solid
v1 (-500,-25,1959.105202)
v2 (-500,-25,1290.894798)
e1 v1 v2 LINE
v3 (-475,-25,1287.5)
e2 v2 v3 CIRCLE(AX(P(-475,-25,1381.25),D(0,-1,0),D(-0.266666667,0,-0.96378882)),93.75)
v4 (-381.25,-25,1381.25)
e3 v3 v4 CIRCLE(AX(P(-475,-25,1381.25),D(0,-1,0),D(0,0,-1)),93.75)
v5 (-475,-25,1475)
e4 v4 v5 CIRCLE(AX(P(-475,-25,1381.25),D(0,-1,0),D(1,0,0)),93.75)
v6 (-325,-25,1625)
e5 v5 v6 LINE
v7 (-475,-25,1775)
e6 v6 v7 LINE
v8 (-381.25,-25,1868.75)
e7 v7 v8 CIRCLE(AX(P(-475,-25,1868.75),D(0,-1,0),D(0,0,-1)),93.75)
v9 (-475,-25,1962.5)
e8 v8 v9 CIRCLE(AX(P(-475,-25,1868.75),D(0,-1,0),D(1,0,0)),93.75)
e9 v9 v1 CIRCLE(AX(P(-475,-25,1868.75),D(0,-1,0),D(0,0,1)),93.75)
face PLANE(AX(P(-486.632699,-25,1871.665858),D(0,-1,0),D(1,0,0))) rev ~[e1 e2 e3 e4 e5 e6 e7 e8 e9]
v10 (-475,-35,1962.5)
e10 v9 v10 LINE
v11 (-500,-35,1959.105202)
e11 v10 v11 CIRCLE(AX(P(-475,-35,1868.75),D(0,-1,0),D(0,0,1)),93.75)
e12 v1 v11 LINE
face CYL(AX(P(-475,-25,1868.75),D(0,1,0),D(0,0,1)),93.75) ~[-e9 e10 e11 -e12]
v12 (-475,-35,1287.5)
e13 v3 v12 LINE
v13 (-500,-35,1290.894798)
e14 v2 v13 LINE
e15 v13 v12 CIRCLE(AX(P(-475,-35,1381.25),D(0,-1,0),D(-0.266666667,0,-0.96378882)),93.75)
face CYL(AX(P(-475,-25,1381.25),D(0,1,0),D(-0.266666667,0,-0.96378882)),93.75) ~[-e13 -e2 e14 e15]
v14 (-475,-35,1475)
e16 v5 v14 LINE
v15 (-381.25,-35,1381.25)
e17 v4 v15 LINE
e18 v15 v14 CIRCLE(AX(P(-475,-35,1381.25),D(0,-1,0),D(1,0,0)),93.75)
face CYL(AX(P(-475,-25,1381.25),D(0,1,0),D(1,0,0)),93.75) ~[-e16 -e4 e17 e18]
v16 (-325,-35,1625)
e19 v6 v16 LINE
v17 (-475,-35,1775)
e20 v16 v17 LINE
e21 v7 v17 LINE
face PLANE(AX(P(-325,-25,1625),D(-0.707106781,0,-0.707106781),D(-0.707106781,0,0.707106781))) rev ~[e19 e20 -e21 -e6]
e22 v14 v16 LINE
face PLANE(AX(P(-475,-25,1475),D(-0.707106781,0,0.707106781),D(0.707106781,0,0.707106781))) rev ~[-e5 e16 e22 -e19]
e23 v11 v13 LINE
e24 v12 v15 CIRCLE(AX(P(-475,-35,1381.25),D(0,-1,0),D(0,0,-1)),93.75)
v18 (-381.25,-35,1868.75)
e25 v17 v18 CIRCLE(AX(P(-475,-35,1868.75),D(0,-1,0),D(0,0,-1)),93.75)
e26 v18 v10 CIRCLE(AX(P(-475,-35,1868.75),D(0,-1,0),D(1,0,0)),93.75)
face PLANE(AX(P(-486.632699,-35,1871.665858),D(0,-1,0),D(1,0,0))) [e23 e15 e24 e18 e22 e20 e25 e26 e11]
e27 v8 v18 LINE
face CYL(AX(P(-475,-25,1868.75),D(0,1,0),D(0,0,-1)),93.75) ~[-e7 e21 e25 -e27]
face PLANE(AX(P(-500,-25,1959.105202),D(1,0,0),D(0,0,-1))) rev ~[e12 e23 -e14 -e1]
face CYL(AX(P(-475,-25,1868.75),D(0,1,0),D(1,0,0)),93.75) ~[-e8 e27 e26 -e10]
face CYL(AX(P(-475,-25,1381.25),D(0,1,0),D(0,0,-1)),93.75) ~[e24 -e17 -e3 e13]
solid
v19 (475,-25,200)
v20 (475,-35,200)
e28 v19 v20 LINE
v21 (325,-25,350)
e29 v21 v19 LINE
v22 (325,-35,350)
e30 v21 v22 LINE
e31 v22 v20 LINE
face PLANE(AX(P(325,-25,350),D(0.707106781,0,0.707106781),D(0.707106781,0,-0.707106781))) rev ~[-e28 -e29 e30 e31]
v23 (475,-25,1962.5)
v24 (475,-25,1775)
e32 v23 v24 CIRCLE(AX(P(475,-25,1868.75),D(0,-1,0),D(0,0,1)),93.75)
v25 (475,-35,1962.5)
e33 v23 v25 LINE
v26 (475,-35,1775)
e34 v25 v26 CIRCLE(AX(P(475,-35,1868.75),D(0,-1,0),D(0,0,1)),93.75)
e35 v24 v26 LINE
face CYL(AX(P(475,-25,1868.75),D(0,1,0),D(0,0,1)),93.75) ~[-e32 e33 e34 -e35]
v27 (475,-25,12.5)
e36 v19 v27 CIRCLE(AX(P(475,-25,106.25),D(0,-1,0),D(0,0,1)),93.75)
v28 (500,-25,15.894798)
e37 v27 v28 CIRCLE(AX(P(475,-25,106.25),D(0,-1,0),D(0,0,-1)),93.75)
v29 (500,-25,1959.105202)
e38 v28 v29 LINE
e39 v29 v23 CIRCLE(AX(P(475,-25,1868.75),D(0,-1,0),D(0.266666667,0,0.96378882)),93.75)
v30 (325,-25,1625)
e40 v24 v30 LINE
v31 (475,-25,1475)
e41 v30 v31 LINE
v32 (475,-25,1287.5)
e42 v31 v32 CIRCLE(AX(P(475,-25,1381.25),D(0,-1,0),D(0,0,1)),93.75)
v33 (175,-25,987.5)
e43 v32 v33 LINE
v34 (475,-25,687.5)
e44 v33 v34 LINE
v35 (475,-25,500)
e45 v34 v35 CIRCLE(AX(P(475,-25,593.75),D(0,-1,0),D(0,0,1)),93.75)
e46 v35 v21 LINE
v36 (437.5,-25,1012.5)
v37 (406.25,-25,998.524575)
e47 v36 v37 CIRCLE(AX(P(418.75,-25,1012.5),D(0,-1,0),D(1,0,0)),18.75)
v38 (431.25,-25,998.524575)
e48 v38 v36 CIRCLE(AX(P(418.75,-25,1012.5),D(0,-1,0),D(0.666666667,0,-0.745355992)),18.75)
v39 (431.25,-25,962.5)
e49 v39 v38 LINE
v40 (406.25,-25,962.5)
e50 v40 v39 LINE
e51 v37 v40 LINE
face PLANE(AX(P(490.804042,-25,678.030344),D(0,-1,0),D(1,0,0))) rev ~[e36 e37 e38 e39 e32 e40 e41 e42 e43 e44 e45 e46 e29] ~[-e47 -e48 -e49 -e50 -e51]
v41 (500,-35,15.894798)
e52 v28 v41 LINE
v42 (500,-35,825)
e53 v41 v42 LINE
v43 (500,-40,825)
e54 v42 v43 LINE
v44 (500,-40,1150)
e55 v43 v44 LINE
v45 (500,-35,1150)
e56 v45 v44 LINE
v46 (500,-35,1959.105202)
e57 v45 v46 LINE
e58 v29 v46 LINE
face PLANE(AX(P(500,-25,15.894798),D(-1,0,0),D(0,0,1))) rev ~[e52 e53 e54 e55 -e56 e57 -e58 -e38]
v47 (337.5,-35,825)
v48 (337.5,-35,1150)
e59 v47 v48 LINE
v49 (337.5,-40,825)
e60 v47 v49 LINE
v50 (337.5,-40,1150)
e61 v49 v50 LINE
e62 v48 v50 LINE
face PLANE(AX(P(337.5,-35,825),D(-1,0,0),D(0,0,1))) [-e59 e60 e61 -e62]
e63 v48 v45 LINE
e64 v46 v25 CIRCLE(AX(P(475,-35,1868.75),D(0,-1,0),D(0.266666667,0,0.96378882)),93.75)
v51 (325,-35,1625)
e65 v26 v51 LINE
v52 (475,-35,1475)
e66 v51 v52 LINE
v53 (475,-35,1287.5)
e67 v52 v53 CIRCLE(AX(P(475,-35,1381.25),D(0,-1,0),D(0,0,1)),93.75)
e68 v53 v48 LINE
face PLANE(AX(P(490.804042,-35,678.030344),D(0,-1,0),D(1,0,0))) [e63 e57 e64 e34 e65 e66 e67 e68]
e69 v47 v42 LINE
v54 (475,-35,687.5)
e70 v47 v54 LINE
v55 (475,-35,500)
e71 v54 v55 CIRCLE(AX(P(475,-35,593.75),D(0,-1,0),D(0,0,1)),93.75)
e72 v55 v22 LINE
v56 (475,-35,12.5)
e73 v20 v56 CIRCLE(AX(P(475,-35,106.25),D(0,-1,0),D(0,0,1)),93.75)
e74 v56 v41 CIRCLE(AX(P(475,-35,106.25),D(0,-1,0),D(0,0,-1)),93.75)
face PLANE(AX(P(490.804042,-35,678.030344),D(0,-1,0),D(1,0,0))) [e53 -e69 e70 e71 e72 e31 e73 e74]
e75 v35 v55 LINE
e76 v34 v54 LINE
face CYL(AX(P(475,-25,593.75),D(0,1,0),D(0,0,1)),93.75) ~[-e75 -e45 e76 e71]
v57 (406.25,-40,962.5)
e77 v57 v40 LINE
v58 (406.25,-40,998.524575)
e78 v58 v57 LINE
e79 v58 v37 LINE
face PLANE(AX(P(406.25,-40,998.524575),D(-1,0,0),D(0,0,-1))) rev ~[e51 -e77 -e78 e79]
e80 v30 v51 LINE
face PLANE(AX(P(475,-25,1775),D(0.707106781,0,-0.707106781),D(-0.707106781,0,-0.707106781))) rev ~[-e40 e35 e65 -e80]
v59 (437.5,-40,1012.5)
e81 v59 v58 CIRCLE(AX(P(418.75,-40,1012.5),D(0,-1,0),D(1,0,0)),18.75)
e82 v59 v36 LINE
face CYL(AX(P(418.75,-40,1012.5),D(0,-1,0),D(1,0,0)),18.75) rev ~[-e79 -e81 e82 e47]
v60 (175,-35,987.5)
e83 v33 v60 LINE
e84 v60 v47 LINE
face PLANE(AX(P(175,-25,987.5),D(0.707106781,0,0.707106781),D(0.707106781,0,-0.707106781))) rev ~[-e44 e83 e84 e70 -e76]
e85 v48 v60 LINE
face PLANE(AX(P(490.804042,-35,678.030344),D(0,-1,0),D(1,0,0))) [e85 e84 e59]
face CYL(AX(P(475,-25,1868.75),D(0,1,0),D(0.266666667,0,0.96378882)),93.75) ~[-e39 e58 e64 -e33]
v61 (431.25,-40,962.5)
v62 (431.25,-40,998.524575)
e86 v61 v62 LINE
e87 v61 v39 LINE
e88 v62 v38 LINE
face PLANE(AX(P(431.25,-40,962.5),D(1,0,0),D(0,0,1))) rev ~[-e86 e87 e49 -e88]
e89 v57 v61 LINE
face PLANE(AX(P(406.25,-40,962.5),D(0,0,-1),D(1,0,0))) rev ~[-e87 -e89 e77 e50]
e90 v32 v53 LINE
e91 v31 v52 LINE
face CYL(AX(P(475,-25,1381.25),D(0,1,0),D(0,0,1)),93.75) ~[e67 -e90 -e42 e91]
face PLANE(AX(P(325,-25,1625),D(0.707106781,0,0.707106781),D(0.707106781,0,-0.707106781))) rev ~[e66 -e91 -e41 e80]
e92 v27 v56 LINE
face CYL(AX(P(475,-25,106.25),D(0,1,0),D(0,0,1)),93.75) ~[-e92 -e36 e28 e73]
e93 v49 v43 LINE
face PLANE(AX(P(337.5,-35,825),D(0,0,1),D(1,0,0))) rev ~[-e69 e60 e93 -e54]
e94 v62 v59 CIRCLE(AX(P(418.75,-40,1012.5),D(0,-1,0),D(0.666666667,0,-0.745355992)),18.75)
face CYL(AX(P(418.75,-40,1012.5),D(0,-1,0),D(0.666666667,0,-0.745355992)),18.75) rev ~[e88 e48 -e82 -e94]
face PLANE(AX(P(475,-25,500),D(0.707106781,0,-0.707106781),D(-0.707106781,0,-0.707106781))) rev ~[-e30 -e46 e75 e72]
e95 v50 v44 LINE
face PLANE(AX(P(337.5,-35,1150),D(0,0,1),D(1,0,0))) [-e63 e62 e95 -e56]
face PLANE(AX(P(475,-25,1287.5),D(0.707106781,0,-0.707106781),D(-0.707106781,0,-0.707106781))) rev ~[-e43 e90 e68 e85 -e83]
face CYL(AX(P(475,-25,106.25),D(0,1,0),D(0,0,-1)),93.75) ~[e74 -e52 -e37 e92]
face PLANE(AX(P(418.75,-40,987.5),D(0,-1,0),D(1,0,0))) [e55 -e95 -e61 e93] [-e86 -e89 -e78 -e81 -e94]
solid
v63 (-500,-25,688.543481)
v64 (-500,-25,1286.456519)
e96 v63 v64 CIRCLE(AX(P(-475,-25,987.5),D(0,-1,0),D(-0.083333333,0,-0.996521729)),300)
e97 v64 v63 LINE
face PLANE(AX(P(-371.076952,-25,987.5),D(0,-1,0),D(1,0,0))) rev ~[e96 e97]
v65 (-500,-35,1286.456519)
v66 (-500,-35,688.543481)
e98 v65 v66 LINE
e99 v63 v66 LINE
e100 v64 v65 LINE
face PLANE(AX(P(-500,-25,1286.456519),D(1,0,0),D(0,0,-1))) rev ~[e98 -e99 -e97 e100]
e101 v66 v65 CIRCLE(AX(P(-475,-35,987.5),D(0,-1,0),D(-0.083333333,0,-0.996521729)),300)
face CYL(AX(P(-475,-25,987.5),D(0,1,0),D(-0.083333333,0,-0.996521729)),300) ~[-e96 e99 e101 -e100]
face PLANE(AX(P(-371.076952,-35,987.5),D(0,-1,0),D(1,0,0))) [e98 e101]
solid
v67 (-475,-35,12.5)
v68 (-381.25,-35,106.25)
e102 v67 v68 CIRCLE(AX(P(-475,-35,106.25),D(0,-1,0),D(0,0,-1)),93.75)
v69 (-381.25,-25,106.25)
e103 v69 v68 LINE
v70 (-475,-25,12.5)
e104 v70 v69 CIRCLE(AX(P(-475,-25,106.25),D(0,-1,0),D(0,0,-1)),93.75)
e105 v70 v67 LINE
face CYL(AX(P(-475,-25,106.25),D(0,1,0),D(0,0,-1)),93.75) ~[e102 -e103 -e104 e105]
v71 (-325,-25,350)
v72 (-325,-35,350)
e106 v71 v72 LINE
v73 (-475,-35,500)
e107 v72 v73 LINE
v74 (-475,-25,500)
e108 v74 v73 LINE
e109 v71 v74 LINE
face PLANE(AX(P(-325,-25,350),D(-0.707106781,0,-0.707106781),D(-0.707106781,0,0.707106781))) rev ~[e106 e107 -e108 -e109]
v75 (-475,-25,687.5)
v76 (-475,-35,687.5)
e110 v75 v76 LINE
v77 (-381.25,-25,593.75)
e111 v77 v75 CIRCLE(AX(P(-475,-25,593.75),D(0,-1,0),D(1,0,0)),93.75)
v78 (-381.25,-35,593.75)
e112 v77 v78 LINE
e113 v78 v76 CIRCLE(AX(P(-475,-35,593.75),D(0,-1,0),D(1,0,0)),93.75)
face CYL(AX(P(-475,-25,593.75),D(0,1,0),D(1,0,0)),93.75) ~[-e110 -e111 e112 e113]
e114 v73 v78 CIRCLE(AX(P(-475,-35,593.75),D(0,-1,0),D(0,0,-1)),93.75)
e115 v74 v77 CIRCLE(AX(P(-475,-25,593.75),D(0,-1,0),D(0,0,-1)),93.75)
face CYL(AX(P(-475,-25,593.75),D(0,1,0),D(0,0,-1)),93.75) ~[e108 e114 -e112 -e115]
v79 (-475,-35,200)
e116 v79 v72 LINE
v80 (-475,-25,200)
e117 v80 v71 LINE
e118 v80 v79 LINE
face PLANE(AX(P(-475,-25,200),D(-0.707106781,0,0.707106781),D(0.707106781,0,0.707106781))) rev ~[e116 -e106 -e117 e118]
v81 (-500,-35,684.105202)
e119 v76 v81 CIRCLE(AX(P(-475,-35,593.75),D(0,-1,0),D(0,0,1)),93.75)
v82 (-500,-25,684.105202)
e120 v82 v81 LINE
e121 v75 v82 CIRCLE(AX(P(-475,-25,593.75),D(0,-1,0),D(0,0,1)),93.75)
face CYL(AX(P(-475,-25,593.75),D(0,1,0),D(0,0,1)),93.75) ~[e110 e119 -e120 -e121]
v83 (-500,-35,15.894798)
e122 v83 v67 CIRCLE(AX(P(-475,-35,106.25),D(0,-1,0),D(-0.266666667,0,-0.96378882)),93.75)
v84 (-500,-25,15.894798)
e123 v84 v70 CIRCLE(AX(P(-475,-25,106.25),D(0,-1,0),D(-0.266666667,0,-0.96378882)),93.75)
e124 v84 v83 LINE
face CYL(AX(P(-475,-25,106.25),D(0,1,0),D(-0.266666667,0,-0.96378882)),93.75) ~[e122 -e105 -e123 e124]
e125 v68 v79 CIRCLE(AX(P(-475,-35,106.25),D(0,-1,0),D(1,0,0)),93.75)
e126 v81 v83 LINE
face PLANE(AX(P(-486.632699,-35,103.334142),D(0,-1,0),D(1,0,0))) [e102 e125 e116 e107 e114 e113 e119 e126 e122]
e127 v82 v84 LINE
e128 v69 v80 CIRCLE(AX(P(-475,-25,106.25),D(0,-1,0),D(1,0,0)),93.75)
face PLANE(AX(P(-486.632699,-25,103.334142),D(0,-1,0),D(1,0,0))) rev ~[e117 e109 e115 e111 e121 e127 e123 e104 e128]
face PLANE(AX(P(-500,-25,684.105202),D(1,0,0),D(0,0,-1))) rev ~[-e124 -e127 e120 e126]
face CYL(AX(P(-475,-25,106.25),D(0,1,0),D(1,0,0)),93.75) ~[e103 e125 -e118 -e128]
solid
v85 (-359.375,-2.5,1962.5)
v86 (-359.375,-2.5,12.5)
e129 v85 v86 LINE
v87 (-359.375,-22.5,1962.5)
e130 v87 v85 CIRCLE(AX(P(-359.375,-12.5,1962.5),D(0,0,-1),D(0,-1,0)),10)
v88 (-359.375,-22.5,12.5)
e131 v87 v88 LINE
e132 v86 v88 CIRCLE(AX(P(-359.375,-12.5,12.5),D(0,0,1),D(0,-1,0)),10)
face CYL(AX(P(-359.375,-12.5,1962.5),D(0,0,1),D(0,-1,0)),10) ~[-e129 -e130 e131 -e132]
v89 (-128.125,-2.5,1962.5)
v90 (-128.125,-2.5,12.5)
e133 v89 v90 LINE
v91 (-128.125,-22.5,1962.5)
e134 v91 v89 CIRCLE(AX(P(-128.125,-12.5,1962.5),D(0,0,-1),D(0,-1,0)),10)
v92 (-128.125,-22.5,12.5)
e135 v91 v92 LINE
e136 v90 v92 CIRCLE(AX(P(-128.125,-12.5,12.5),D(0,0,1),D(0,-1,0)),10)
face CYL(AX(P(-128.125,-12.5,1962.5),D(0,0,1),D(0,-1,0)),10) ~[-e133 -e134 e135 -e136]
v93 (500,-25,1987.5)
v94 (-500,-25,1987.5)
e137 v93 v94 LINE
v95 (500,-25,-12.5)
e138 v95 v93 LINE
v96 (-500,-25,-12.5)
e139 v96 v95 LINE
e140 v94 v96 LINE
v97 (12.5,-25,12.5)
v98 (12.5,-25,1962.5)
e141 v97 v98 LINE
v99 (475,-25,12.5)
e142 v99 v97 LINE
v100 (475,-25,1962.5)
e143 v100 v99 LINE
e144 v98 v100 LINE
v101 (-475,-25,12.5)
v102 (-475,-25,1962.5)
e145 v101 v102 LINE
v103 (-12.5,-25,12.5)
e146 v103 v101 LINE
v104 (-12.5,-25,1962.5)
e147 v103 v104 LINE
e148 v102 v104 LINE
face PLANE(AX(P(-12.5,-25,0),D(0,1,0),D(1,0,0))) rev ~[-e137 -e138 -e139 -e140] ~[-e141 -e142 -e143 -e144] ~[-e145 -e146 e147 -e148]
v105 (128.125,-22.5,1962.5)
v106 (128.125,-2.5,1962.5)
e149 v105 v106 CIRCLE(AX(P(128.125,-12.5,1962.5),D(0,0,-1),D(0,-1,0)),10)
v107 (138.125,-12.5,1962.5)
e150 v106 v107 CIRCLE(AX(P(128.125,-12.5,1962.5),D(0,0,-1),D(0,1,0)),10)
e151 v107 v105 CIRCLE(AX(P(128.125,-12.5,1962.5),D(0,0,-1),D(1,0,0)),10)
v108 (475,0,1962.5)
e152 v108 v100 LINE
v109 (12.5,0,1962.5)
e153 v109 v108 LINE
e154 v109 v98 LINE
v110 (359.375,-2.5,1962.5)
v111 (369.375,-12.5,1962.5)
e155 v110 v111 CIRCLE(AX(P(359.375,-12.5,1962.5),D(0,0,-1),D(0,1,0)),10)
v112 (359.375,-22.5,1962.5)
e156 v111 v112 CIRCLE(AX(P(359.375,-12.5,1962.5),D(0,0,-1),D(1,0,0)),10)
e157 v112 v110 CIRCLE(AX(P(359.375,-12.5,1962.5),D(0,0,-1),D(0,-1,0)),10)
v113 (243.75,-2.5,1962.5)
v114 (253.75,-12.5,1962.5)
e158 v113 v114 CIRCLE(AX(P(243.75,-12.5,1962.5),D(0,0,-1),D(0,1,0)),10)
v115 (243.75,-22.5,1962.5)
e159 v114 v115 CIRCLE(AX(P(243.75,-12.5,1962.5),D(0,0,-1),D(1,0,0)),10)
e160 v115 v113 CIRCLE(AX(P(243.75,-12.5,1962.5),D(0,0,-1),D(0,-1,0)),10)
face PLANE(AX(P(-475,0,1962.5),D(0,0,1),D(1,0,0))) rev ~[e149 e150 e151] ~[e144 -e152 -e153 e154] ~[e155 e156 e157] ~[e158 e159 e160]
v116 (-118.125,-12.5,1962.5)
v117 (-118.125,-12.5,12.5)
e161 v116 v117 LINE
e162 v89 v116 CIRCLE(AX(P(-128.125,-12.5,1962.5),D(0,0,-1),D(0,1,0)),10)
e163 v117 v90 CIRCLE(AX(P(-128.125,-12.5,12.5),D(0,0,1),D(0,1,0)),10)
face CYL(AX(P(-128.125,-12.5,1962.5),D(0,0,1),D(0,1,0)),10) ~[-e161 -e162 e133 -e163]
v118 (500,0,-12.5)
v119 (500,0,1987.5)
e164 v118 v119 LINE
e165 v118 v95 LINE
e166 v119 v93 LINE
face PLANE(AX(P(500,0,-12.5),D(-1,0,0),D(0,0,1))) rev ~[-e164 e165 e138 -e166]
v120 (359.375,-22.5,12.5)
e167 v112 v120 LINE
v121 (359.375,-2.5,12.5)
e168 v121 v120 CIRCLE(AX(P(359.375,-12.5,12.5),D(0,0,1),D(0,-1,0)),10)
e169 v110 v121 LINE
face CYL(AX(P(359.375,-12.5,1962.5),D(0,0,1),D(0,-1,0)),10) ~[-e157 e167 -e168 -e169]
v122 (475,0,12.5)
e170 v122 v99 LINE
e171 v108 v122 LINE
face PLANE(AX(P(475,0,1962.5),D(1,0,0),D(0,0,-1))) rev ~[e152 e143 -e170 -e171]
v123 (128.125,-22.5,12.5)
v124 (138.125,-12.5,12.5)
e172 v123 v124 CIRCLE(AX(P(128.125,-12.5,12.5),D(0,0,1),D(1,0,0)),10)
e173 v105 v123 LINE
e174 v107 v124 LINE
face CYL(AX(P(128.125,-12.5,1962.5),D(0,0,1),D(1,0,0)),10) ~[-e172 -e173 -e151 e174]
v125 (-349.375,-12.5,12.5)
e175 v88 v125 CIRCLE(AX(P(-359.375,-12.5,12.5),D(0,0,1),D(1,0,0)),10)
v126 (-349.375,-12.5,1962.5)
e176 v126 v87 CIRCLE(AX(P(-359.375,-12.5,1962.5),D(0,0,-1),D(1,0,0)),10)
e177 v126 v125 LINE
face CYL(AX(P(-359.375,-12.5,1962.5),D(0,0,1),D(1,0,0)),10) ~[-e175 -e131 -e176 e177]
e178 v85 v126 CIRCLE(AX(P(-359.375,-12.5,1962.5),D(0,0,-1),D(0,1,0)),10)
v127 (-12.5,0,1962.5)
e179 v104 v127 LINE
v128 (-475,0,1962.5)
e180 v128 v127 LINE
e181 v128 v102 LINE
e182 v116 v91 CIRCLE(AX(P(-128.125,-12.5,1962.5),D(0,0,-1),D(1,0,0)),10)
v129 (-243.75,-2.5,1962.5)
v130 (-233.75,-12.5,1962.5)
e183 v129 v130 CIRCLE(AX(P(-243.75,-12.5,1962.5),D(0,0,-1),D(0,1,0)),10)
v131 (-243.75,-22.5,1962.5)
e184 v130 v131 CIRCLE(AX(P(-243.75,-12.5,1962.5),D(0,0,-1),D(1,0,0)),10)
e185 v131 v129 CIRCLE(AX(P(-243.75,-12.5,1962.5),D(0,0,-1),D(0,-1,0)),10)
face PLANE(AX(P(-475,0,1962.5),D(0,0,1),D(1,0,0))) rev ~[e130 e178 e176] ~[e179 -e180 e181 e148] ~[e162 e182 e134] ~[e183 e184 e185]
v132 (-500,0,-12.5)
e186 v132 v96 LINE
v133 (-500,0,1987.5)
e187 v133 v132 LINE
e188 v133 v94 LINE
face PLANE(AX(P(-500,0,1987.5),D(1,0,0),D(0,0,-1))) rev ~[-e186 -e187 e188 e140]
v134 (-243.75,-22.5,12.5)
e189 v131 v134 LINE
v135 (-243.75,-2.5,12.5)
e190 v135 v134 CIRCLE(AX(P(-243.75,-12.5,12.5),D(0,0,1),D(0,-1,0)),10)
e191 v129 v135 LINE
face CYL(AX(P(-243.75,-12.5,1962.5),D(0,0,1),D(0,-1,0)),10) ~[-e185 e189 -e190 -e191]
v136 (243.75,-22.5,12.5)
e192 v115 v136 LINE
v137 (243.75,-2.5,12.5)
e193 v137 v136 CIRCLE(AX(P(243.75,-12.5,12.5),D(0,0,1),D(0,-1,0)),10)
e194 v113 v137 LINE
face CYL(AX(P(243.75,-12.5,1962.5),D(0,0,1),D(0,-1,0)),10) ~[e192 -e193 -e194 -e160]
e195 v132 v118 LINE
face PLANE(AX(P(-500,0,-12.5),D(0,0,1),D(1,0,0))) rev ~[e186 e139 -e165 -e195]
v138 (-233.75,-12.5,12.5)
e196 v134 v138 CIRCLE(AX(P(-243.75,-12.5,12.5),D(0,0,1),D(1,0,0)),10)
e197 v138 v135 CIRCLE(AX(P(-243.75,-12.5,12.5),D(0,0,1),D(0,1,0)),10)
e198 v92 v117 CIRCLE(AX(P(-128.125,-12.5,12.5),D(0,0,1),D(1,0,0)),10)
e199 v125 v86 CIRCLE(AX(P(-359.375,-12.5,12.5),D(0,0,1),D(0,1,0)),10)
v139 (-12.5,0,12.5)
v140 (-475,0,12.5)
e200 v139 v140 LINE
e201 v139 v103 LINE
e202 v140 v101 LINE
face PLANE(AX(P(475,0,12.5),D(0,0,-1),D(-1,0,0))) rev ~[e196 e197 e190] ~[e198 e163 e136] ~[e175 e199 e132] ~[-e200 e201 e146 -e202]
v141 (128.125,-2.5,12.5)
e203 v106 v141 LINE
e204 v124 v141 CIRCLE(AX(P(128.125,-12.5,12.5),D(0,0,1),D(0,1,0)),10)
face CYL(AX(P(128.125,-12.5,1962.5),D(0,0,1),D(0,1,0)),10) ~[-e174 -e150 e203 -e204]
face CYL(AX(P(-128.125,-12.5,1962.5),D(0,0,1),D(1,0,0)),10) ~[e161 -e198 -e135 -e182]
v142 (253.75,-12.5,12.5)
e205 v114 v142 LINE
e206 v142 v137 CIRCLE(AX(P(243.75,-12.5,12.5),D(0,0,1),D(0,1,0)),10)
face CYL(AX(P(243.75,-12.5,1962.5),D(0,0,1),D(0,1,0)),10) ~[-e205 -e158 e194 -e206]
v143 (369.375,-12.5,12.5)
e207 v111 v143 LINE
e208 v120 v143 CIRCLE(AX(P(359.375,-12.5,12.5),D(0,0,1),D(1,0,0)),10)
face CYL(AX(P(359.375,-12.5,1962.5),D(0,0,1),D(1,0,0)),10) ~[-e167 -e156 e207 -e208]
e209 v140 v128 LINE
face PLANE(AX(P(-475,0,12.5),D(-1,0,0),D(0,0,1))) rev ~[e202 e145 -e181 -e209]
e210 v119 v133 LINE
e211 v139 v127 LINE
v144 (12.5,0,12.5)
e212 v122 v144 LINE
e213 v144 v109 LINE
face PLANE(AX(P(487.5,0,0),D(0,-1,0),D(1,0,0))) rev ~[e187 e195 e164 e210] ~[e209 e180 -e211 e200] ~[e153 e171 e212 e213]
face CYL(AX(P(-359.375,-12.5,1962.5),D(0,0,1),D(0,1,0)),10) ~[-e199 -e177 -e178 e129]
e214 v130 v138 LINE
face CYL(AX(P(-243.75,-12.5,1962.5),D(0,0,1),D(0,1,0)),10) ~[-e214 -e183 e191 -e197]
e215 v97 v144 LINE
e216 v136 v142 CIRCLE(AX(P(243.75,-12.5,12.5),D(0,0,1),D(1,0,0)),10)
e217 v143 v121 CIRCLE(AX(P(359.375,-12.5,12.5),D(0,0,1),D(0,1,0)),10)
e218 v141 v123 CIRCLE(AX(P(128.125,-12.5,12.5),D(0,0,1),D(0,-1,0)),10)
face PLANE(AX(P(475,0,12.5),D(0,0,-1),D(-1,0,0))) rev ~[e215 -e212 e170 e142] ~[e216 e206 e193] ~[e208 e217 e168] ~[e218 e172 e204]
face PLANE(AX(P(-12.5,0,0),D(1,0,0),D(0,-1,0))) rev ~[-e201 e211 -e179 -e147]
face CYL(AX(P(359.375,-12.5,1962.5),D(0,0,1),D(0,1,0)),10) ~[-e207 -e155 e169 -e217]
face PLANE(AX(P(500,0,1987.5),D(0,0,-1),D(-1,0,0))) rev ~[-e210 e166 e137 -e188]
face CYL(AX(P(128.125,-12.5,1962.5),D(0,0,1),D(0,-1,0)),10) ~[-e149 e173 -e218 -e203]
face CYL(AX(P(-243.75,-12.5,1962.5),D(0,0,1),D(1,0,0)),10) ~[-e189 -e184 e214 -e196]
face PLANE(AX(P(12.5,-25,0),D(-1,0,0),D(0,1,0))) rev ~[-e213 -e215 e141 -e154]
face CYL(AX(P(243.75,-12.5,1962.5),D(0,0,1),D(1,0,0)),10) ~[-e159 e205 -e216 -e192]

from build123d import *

# Parameters (mm, degrees)
F0_W      = 25
F0_H      = 25
F0_H_2    = 1950
F0_W_2    = 950
F1_DEPTH  = 25
F3_DEPTH  = 1975
F5_DEPTH  = 10
F7_DEPTH  = 1975
F9_DEPTH  = 1975
F10_W     = 162.5
F10_H     = 325
F11_DEPTH = 5
F13_DEPTH = 86.3


# Not quite as in the source:
# - ends of sketch curves that miss each other by under 0.0002 mm in the source are joined


with BuildPart() as f1:
    # F0 (on Front) → F1 (new body)
    with BuildSketch(Plane.XZ):
        with Locations((487.5, 0)):
            Rectangle(F0_W, F0_H)
        with Locations((487.5, 987.5)):
            Rectangle(F0_W, F0_H_2)
        Rectangle(F0_W_2, F0_H)
        with Locations((487.5, 1975)):
            Rectangle(F0_W, F0_H)
        with Locations((-487.5, 0)):
            Rectangle(F0_W, F0_H)
        with Locations((-487.5, 987.5)):
            Rectangle(F0_W, F0_H_2)
        with Locations((0, 1975)):
            Rectangle(F0_W_2, F0_H)
        with Locations((-487.5, 1975)):
            Rectangle(F0_W, F0_H)
    extrude(amount=F1_DEPTH)

    # F2 (on Top) → F3 (join)
    with BuildSketch(Plane.XY):
        Polygon((12.5, 0), (0, 0), (-12.5, 0), (-12.5, -25), (0, -25), (12.5, -25), align=None)
    extrude(amount=F3_DEPTH)

    # F6 (on face) → F7 (join)
    with BuildSketch(Plane(origin=(0, 0, 1962.5), x_dir=(1, 0, 0), z_dir=(0, 0, -1))):
        with BuildLine():
            Line((-128.125, 2.5), (-128.125, 22.5))
            ThreePointArc((-128.125, 22.5), (-138.125, 12.5), (-128.125, 2.5))
        make_face()
        with BuildLine():
            ThreePointArc((-118.125, 12.5), (-121.0539321881, 19.5710678119), (-128.125, 22.5))
            Line((-128.125, 22.5), (-128.125, 2.5))
            ThreePointArc((-128.125, 2.5), (-121.0539321881, 5.4289321881), (-118.125, 12.5))
        make_face()
        with BuildLine():
            Line((-359.375, 2.5), (-359.375, 22.5))
            ThreePointArc((-359.375, 22.5), (-369.375, 12.5), (-359.375, 2.5))
        make_face()
        with BuildLine():
            ThreePointArc((-349.375, 12.5), (-352.3039321881, 19.5710678119), (-359.375, 22.5))
            Line((-359.375, 22.5), (-359.375, 2.5))
            ThreePointArc((-359.375, 2.5), (-352.3039321881, 5.4289321881), (-349.375, 12.5))
        make_face()
        with BuildLine():
            ThreePointArc((-233.75, 12.5), (-236.6789321881, 19.5710678119), (-243.75, 22.5))
            Line((-243.75, 22.5), (-243.75, 2.5))
            ThreePointArc((-243.75, 2.5), (-236.6789321881, 5.4289321881), (-233.75, 12.5))
        make_face()
        with BuildLine():
            Line((-243.75, 2.5), (-243.75, 22.5))
            ThreePointArc((-243.75, 22.5), (-253.75, 12.5), (-243.75, 2.5))
        make_face()
    extrude(amount=F7_DEPTH)

    # F8 (on face) → F9 (join)
    with BuildSketch(Plane(origin=(0, 0, 1962.5), x_dir=(1, 0, 0), z_dir=(0, 0, -1))):
        with BuildLine():
            Line((128.125, 2.5), (128.125, 22.5))
            ThreePointArc((128.125, 22.5), (118.125, 12.5), (128.125, 2.5))
        make_face()
        with BuildLine():
            ThreePointArc((138.125, 12.5), (135.1960678119, 19.5710678119), (128.125, 22.5))
            Line((128.125, 22.5), (128.125, 2.5))
            ThreePointArc((128.125, 2.5), (135.1960678119, 5.4289321881), (138.125, 12.5))
        make_face()
        with BuildLine():
            Line((359.375, 2.5), (359.375, 22.5))
            ThreePointArc((359.375, 22.5), (349.375, 12.5), (359.375, 2.5))
        make_face()
        with BuildLine():
            ThreePointArc((369.375, 12.5), (366.4460678119, 19.5710678119), (359.375, 22.5))
            Line((359.375, 22.5), (359.375, 2.5))
            ThreePointArc((359.375, 2.5), (366.4460678119, 5.4289321881), (369.375, 12.5))
        make_face()
        with BuildLine():
            Line((243.75, 2.5), (243.75, 22.5))
            ThreePointArc((243.75, 22.5), (233.75, 12.5), (243.75, 2.5))
        make_face()
        with BuildLine():
            ThreePointArc((253.75, 12.5), (250.8210678119, 19.5710678119), (243.75, 22.5))
            Line((243.75, 22.5), (243.75, 2.5))
            ThreePointArc((243.75, 2.5), (250.8210678119, 5.4289321881), (253.75, 12.5))
        make_face()
    extrude(amount=F9_DEPTH)


with BuildPart() as f5:
    # F4 (on face) → F5 (new body)
    with BuildSketch(Plane.XZ.offset(25)):
        with BuildLine():
            ThreePointArc((500, 684.1052018425), (487.6147201171, 686.6474237337), (475, 687.5))
            Line((475, 687.5), (500, 662.5))
            Line((500, 662.5), (500, 684.1052018425))
        make_face()
        with BuildLine():
            Line((475, 500), (475, 687.5))
            ThreePointArc((475, 687.5), (381.25, 593.75), (475, 500))
        make_face()
        with BuildLine():
            Line((475, 1287.5), (475, 687.5))
            ThreePointArc((475, 687.5), (487.6147201171, 686.6474237337), (500, 684.1052018425))
            Line((500, 684.1052018425), (500, 1290.8947981575))
            ThreePointArc((500, 1290.8947981575), (487.6147201171, 1288.3525762663), (475, 1287.5))
        make_face()
        Polygon((175, 987.5), (475, 687.5), (475, 1287.5), align=None)
        Polygon((500, 662.5), (475, 687.5), (475, 500), (500, 525), align=None)
        with BuildLine():
            ThreePointArc((500, 503.3947981575), (487.6147201171, 500.8525762663), (475, 500))
            Line((475, 500), (475, 350))
            Line((475, 350), (475, 200))
            ThreePointArc((475, 200), (487.6147201171, 199.1474237337), (500, 196.6052018425))
            Line((500, 196.6052018425), (500, 503.3947981575))
        make_face()
        Polygon((475, 350), (475, 500), (325, 350), align=None)
        with BuildLine():
            Line((500, 525), (475, 500))
            ThreePointArc((475, 500), (487.6147201171, 500.8525762663), (500, 503.3947981575))
            Line((500, 503.3947981575), (500, 525))
        make_face()
        Polygon((475, 1475), (475, 1287.5), (500, 1312.5), (500, 1450), align=None)
        with BuildLine():
            Line((500, 1312.5), (475, 1287.5))
            ThreePointArc((475, 1287.5), (487.6147201171, 1288.3525762663), (500, 1290.8947981575))
            Line((500, 1290.8947981575), (500, 1312.5))
        make_face()
        with BuildLine():
            ThreePointArc((475, 1475), (381.25, 1381.25), (475, 1287.5))
            Line((475, 1287.5), (475, 1475))
        make_face()
        Polygon((475, 200), (475, 350), (325, 350), align=None)
        Polygon((325, 1625), (475, 1475), (475, 1625), align=None)
        with BuildLine():
            ThreePointArc((500, 1471.6052018425), (487.6147201171, 1474.1474237337), (475, 1475))
            Line((475, 1475), (500, 1450))
            Line((500, 1450), (500, 1471.6052018425))
        make_face()
        with BuildLine():
            Line((475, 1625), (475, 1475))
            ThreePointArc((475, 1475), (487.6147201171, 1474.1474237337), (500, 1471.6052018425))
            Line((500, 1471.6052018425), (500, 1778.3947981575))
            ThreePointArc((500, 1778.3947981575), (487.6147201171, 1775.8525762663), (475, 1775))
            Line((475, 1775), (475, 1625))
        make_face()
        with BuildLine():
            ThreePointArc((500, 196.6052018425), (487.6147201171, 199.1474237337), (475, 200))
            Line((475, 200), (500, 175))
            Line((500, 175), (500, 196.6052018425))
        make_face()
        with BuildLine():
            Line((475, 12.5), (475, 200))
            ThreePointArc((475, 200), (381.25, 106.25), (475, 12.5))
        make_face()
        with BuildLine():
            Line((500, 175), (475, 200))
            Line((475, 200), (475, 12.5))
            ThreePointArc((475, 12.5), (487.6147201171, 13.3525762663), (500, 15.8947981575))
            Line((500, 15.8947981575), (500, 175))
        make_face()
        Polygon((325, 1625), (475, 1625), (475, 1775), align=None)
        with BuildLine():
            Line((475, 1962.5), (475, 1775))
            Line((475, 1775), (500, 1800))
            Line((500, 1800), (500, 1959.1052018425))
            ThreePointArc((500, 1959.1052018425), (487.6147201171, 1961.6474237337), (475, 1962.5))
        make_face()
        with BuildLine():
            Line((500, 1800), (475, 1775))
            ThreePointArc((475, 1775), (487.6147201171, 1775.8525762663), (500, 1778.3947981575))
            Line((500, 1778.3947981575), (500, 1800))
        make_face()
        with BuildLine():
            ThreePointArc((475, 1962.5), (381.25, 1868.75), (475, 1775))
            Line((475, 1775), (475, 1962.5))
        make_face()
    extrude(amount=F5_DEPTH)

    # F10 (on face) → F11 (join)
    with BuildSketch(Plane.XZ.offset(35)):
        with Locations((418.75, 987.5)):
            Rectangle(F10_W, F10_H)
    extrude(amount=F11_DEPTH)

    # F12 (on face) → F13 (cut)
    with BuildSketch(Plane.XZ.offset(40)):
        with BuildLine():
            Line((406.25, 962.5), (431.25, 962.5))
            Line((431.25, 962.5), (431.25, 998.5245751406))
            ThreePointArc((431.25, 998.5245751406), (418.75, 993.75), (406.25, 998.5245751406))
            Line((406.25, 998.5245751406), (406.25, 962.5))
        make_face()
        with BuildLine():
            ThreePointArc((406.25, 998.5245751406), (418.75, 993.75), (431.25, 998.5245751406))
            ThreePointArc((431.25, 998.5245751406), (435.866329922, 1004.8453445538), (437.5, 1012.5))
            ThreePointArc((437.5, 1012.5), (411.0953445538, 1029.616329922), (406.25, 998.5245751406))
        make_face()
    extrude(amount=-F13_DEPTH, mode=Mode.SUBTRACT)


with BuildPart() as f5b:
    # F4 (on face) → F5, piece 2 (new body)
    with BuildSketch(Plane.XZ.offset(25)):
        with BuildLine():
            Line((-500, 175), (-500, 15.8947981575))
            ThreePointArc((-500, 15.8947981575), (-487.6147201171, 13.3525762663), (-475, 12.5))
            Line((-475, 12.5), (-475, 200))
            Line((-475, 200), (-500, 175))
        make_face()
        with BuildLine():
            Line((-500, 503.3947981575), (-500, 196.6052018425))
            ThreePointArc((-500, 196.6052018425), (-487.6147201171, 199.1474237337), (-475, 200))
            Line((-475, 200), (-475, 350))
            Line((-475, 350), (-475, 500))
            ThreePointArc((-475, 500), (-487.6147201171, 500.8525762663), (-500, 503.3947981575))
        make_face()
        with BuildLine():
            ThreePointArc((-475, 200), (-487.6147201171, 199.1474237337), (-500, 196.6052018425))
            Line((-500, 196.6052018425), (-500, 175))
            Line((-500, 175), (-475, 200))
        make_face()
        with BuildLine():
            Line((-475, 200), (-475, 12.5))
            ThreePointArc((-475, 12.5), (-408.7087392638, 39.9587392638), (-381.25, 106.25))
            ThreePointArc((-381.25, 106.25), (-408.7087392638, 172.5412607362), (-475, 200))
        make_face()
        Polygon((-475, 350), (-475, 200), (-325, 350), align=None)
        with BuildLine():
            Line((-500, 525), (-500, 503.3947981575))
            ThreePointArc((-500, 503.3947981575), (-487.6147201171, 500.8525762663), (-475, 500))
            Line((-475, 500), (-500, 525))
        make_face()
        Polygon((-475, 500), (-475, 350), (-325, 350), align=None)
        with BuildLine():
            ThreePointArc((-475, 687.5), (-487.6147201171, 686.6474237337), (-500, 684.1052018425))
            Line((-500, 684.1052018425), (-500, 525))
            Line((-500, 525), (-475, 500))
            Line((-475, 500), (-475, 687.5))
        make_face()
        with BuildLine():
            Line((-475, 687.5), (-475, 500))
            ThreePointArc((-475, 500), (-408.7087392638, 527.4587392638), (-381.25, 593.75))
            ThreePointArc((-381.25, 593.75), (-408.7087392638, 660.0412607362), (-475, 687.5))
        make_face()
    extrude(amount=F5_DEPTH)


with BuildPart() as f5c:
    # F4 (on face) → F5, piece 3 (new body)
    with BuildSketch(Plane.XZ.offset(25)):
        with BuildLine():
            ThreePointArc((-475, 1962.5), (-487.6147201171, 1961.6474237337), (-500, 1959.1052018425))
            Line((-500, 1959.1052018425), (-500, 1800))
            Line((-500, 1800), (-475, 1775))
            Line((-475, 1775), (-475, 1962.5))
        make_face()
        with BuildLine():
            ThreePointArc((-381.25, 1868.75), (-408.7087392638, 1935.0412607362), (-475, 1962.5))
            Line((-475, 1962.5), (-475, 1775))
            ThreePointArc((-475, 1775), (-408.7087392638, 1802.4587392638), (-381.25, 1868.75))
        make_face()
        with BuildLine():
            Line((-500, 1800), (-500, 1778.3947981575))
            ThreePointArc((-500, 1778.3947981575), (-487.6147201171, 1775.8525762663), (-475, 1775))
            Line((-475, 1775), (-500, 1800))
        make_face()
        with BuildLine():
            ThreePointArc((-475, 1775), (-487.6147201171, 1775.8525762663), (-500, 1778.3947981575))
            Line((-500, 1778.3947981575), (-500, 1471.6052018425))
            ThreePointArc((-500, 1471.6052018425), (-487.6147201171, 1474.1474237337), (-475, 1475))
            Line((-475, 1475), (-475, 1625))
            Line((-475, 1625), (-475, 1775))
        make_face()
        Polygon((-325, 1625), (-475, 1775), (-475, 1625), align=None)
        with BuildLine():
            ThreePointArc((-475, 1475), (-487.6147201171, 1474.1474237337), (-500, 1471.6052018425))
            Line((-500, 1471.6052018425), (-500, 1450))
            Line((-500, 1450), (-475, 1475))
        make_face()
        Polygon((-325, 1625), (-475, 1625), (-475, 1475), align=None)
        with BuildLine():
            Line((-475, 1287.5), (-475, 1475))
            Line((-475, 1475), (-500, 1450))
            Line((-500, 1450), (-500, 1290.8947981575))
            ThreePointArc((-500, 1290.8947981575), (-487.6147202668, 1288.3525762866), (-475, 1287.5))
        make_face()
        with BuildLine():
            ThreePointArc((-381.25, 1381.25), (-408.7087392638, 1447.5412607362), (-475, 1475))
            Line((-475, 1475), (-475, 1287.5))
            ThreePointArc((-475, 1287.5), (-408.7087393706, 1314.9587391569), (-381.25, 1381.25))
        make_face()
    extrude(amount=F5_DEPTH)


with BuildPart() as f5d:
    # F4 (on face) → F5, piece 4 (new body)
    with BuildSketch(Plane.XZ.offset(25)):
        with BuildLine():
            Line((-475, 1287.5), (-475, 687.5))
            ThreePointArc((-475, 687.5), (-262.867965644, 775.367965644), (-175, 987.5))
            ThreePointArc((-175, 987.5), (-262.8679657509, 1199.6320344628), (-475, 1287.5))
        make_face()
        with BuildLine():
            ThreePointArc((-500, 688.5434814225), (-487.5108837965, 687.7609838766), (-475, 687.5))
            Line((-475, 687.5), (-475, 1287.5))
            ThreePointArc((-475, 1287.5), (-487.5108839475, 1287.2390161171), (-500, 1286.4565185775))
            Line((-500, 1286.4565185775), (-500, 688.5434814225))
        make_face()
    extrude(amount=F5_DEPTH)


solid = Compound([f1.part, f5.part, f5b.part, f5c.part, f5d.part])
